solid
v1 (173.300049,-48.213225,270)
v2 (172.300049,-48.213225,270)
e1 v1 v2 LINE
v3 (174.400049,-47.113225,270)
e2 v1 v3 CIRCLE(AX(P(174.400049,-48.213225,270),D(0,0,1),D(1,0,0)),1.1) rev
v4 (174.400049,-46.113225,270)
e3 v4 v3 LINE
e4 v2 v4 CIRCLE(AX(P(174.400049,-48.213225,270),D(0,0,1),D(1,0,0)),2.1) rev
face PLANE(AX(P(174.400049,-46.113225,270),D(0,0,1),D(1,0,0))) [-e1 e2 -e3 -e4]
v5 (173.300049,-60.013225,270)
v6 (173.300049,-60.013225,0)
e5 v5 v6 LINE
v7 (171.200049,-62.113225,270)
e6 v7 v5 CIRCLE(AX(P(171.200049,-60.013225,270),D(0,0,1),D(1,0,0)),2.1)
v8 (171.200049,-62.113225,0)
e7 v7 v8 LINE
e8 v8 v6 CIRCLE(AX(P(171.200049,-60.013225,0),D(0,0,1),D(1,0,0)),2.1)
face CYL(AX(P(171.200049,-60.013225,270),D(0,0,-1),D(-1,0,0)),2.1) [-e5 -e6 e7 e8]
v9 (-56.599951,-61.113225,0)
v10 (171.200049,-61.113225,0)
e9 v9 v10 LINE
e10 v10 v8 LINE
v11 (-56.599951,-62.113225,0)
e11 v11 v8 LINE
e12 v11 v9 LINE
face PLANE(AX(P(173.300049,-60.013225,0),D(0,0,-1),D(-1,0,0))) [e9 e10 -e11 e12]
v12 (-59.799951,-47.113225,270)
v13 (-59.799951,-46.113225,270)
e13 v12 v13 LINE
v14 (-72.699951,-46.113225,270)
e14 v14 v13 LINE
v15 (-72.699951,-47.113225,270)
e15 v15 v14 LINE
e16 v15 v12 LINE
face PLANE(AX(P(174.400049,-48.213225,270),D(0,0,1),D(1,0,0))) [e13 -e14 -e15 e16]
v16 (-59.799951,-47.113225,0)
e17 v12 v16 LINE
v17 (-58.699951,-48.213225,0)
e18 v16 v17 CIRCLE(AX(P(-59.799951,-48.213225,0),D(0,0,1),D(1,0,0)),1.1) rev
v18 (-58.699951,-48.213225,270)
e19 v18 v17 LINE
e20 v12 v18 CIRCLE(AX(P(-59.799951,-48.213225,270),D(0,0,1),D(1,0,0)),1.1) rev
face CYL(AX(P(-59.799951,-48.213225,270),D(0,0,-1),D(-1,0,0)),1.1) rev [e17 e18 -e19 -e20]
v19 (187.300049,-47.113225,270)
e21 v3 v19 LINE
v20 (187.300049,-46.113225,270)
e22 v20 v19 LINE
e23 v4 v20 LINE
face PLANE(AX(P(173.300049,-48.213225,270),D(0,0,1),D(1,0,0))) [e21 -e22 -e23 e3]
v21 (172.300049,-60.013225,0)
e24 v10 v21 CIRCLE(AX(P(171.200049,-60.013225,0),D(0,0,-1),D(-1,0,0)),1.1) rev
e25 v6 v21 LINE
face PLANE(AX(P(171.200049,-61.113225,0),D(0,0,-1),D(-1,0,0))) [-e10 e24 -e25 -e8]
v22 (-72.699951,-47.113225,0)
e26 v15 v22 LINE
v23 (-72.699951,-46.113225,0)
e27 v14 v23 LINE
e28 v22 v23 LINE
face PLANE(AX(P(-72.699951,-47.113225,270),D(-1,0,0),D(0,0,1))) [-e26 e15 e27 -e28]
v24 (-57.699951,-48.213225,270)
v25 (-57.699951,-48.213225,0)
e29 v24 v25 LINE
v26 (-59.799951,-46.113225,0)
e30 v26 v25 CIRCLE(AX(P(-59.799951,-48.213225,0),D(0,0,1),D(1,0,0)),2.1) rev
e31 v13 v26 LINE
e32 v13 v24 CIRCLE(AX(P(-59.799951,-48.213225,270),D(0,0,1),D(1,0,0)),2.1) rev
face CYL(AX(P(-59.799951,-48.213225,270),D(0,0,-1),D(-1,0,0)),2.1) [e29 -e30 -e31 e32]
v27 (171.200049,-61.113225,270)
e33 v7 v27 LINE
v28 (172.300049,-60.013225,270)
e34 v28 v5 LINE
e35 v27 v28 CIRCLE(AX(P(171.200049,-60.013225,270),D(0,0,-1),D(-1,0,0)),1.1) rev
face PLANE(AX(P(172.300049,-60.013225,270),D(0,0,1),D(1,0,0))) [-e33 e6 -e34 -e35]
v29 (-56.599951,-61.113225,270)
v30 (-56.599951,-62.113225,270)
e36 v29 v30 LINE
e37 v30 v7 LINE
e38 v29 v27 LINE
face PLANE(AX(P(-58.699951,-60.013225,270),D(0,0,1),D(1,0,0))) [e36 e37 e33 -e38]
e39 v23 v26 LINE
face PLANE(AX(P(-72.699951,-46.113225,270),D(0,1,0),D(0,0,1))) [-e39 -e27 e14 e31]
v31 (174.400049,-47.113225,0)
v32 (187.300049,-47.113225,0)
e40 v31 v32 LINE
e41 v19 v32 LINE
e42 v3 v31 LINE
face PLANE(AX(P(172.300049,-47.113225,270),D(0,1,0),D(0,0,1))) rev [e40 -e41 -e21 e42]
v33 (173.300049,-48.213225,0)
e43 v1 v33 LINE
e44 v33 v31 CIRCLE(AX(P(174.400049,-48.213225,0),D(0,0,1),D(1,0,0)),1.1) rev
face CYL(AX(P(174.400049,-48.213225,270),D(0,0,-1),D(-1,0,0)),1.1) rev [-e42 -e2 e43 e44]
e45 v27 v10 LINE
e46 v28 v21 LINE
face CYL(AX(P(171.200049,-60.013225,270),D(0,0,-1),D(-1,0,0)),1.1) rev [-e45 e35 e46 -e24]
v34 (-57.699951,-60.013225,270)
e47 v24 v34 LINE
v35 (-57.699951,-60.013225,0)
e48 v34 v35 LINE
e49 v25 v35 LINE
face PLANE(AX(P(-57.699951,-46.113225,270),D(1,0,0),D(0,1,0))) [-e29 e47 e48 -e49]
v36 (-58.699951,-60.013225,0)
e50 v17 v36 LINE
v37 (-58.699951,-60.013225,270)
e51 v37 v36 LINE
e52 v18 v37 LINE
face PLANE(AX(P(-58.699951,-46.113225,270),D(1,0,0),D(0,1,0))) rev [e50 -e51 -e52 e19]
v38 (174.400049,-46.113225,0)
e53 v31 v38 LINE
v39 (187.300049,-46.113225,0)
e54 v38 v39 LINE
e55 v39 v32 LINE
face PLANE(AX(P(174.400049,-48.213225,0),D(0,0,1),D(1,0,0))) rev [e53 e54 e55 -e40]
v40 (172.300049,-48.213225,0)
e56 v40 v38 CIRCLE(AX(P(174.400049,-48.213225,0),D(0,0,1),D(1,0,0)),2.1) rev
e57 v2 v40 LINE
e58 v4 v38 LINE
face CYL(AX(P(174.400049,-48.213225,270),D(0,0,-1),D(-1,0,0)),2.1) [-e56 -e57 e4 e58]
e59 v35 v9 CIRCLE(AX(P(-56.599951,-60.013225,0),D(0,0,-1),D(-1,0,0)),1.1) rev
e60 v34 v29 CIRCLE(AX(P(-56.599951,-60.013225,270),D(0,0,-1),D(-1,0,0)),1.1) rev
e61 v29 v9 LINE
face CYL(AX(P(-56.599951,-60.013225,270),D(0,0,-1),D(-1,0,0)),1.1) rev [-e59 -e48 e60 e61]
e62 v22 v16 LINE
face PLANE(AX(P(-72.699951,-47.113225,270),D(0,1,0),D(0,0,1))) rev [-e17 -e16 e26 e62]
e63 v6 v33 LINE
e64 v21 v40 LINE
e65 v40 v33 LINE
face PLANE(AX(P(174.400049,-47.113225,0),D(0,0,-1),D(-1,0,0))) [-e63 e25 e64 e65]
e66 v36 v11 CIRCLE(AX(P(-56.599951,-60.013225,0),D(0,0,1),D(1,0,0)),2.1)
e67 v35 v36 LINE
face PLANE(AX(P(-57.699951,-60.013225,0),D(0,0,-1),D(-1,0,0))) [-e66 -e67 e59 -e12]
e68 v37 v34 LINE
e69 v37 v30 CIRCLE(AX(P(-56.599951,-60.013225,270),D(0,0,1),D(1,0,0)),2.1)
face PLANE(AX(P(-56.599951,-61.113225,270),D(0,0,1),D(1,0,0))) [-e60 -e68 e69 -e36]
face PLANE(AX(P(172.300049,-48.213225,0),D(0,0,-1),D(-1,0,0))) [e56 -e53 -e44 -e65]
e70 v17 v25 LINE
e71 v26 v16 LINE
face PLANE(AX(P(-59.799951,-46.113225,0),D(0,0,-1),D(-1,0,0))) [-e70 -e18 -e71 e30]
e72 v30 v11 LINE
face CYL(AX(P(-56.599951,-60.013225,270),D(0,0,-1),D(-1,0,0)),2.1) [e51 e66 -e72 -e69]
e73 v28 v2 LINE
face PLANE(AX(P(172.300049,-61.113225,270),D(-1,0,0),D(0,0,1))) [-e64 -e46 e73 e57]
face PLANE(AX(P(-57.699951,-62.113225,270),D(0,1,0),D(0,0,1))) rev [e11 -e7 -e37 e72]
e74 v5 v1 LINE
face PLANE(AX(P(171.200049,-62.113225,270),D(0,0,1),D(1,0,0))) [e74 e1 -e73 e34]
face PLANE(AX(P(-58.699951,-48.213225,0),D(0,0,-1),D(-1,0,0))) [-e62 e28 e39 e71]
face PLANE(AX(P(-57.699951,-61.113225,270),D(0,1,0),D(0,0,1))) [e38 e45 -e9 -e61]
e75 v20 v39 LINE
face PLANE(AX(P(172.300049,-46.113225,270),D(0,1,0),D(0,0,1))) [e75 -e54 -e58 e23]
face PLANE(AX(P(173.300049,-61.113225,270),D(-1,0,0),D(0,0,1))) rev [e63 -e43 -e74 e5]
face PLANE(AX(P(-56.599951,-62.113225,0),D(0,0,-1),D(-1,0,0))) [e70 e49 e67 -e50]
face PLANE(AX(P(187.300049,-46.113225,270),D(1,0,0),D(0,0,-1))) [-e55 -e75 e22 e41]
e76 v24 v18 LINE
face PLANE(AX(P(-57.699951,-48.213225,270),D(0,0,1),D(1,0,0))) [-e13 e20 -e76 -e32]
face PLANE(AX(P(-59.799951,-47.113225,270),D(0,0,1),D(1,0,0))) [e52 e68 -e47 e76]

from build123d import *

# Parameters (mm, degrees)
SM_BASE_FLANGE_1_DEPTH = 270


# Sheet-metal steps are written as plain solids
with BuildPart() as part:
    # Sketch 1 → Базовая кромка1 (new body)
    with BuildSketch(Plane.XY):
        with BuildLine():
            Line((-72.699950579, -46.113225058), (-59.799950579, -46.113225058))
            ThreePointArc((-59.799950579, -46.113225058), (-58.315026339, -46.728300818), (-57.699950579, -48.213225058))
            Line((-57.699950579, -48.213225058), (-57.699950579, -60.013225058))
            ThreePointArc((-57.699950579, -60.013225058), (-57.377768038, -60.791042517), (-56.599950579, -61.113225058))
            Line((-56.599950579, -61.113225058), (171.200049421, -61.113225058))
            ThreePointArc((171.200049421, -61.113225058), (171.97786688, -60.791042517), (172.300049421, -60.013225058))
            Line((172.300049421, -60.013225058), (172.300049421, -48.213225058))
            ThreePointArc((172.300049421, -48.213225058), (172.915125181, -46.728300818), (174.400049421, -46.113225058))
            Line((174.400049421, -46.113225058), (187.300049421, -46.113225058))
            Line((187.300049421, -46.113225058), (187.300049421, -47.113225058))
            Line((187.300049421, -47.113225058), (174.400049421, -47.113225058))
            ThreePointArc((174.400049421, -47.113225058), (173.622231962, -47.435407599), (173.300049421, -48.213225058))
            Line((173.300049421, -48.213225058), (173.300049421, -60.013225058))
            ThreePointArc((173.300049421, -60.013225058), (172.684973661, -61.498149299), (171.200049421, -62.113225058))
            Line((171.200049421, -62.113225058), (-56.599950579, -62.113225058))
            ThreePointArc((-56.599950579, -62.113225058), (-58.084874819, -61.498149298), (-58.699950579, -60.013225058))
            Line((-58.699950579, -60.013225058), (-58.699950579, -48.213225058))
            ThreePointArc((-58.699950579, -48.213225058), (-59.02213312, -47.435407599), (-59.799950579, -47.113225058))
            Line((-59.799950579, -47.113225058), (-72.699950579, -47.113225058))
            Line((-72.699950579, -47.113225058), (-72.699950579, -46.113225058))
        make_face()
    extrude(amount=SM_BASE_FLANGE_1_DEPTH)


solid = part.part
